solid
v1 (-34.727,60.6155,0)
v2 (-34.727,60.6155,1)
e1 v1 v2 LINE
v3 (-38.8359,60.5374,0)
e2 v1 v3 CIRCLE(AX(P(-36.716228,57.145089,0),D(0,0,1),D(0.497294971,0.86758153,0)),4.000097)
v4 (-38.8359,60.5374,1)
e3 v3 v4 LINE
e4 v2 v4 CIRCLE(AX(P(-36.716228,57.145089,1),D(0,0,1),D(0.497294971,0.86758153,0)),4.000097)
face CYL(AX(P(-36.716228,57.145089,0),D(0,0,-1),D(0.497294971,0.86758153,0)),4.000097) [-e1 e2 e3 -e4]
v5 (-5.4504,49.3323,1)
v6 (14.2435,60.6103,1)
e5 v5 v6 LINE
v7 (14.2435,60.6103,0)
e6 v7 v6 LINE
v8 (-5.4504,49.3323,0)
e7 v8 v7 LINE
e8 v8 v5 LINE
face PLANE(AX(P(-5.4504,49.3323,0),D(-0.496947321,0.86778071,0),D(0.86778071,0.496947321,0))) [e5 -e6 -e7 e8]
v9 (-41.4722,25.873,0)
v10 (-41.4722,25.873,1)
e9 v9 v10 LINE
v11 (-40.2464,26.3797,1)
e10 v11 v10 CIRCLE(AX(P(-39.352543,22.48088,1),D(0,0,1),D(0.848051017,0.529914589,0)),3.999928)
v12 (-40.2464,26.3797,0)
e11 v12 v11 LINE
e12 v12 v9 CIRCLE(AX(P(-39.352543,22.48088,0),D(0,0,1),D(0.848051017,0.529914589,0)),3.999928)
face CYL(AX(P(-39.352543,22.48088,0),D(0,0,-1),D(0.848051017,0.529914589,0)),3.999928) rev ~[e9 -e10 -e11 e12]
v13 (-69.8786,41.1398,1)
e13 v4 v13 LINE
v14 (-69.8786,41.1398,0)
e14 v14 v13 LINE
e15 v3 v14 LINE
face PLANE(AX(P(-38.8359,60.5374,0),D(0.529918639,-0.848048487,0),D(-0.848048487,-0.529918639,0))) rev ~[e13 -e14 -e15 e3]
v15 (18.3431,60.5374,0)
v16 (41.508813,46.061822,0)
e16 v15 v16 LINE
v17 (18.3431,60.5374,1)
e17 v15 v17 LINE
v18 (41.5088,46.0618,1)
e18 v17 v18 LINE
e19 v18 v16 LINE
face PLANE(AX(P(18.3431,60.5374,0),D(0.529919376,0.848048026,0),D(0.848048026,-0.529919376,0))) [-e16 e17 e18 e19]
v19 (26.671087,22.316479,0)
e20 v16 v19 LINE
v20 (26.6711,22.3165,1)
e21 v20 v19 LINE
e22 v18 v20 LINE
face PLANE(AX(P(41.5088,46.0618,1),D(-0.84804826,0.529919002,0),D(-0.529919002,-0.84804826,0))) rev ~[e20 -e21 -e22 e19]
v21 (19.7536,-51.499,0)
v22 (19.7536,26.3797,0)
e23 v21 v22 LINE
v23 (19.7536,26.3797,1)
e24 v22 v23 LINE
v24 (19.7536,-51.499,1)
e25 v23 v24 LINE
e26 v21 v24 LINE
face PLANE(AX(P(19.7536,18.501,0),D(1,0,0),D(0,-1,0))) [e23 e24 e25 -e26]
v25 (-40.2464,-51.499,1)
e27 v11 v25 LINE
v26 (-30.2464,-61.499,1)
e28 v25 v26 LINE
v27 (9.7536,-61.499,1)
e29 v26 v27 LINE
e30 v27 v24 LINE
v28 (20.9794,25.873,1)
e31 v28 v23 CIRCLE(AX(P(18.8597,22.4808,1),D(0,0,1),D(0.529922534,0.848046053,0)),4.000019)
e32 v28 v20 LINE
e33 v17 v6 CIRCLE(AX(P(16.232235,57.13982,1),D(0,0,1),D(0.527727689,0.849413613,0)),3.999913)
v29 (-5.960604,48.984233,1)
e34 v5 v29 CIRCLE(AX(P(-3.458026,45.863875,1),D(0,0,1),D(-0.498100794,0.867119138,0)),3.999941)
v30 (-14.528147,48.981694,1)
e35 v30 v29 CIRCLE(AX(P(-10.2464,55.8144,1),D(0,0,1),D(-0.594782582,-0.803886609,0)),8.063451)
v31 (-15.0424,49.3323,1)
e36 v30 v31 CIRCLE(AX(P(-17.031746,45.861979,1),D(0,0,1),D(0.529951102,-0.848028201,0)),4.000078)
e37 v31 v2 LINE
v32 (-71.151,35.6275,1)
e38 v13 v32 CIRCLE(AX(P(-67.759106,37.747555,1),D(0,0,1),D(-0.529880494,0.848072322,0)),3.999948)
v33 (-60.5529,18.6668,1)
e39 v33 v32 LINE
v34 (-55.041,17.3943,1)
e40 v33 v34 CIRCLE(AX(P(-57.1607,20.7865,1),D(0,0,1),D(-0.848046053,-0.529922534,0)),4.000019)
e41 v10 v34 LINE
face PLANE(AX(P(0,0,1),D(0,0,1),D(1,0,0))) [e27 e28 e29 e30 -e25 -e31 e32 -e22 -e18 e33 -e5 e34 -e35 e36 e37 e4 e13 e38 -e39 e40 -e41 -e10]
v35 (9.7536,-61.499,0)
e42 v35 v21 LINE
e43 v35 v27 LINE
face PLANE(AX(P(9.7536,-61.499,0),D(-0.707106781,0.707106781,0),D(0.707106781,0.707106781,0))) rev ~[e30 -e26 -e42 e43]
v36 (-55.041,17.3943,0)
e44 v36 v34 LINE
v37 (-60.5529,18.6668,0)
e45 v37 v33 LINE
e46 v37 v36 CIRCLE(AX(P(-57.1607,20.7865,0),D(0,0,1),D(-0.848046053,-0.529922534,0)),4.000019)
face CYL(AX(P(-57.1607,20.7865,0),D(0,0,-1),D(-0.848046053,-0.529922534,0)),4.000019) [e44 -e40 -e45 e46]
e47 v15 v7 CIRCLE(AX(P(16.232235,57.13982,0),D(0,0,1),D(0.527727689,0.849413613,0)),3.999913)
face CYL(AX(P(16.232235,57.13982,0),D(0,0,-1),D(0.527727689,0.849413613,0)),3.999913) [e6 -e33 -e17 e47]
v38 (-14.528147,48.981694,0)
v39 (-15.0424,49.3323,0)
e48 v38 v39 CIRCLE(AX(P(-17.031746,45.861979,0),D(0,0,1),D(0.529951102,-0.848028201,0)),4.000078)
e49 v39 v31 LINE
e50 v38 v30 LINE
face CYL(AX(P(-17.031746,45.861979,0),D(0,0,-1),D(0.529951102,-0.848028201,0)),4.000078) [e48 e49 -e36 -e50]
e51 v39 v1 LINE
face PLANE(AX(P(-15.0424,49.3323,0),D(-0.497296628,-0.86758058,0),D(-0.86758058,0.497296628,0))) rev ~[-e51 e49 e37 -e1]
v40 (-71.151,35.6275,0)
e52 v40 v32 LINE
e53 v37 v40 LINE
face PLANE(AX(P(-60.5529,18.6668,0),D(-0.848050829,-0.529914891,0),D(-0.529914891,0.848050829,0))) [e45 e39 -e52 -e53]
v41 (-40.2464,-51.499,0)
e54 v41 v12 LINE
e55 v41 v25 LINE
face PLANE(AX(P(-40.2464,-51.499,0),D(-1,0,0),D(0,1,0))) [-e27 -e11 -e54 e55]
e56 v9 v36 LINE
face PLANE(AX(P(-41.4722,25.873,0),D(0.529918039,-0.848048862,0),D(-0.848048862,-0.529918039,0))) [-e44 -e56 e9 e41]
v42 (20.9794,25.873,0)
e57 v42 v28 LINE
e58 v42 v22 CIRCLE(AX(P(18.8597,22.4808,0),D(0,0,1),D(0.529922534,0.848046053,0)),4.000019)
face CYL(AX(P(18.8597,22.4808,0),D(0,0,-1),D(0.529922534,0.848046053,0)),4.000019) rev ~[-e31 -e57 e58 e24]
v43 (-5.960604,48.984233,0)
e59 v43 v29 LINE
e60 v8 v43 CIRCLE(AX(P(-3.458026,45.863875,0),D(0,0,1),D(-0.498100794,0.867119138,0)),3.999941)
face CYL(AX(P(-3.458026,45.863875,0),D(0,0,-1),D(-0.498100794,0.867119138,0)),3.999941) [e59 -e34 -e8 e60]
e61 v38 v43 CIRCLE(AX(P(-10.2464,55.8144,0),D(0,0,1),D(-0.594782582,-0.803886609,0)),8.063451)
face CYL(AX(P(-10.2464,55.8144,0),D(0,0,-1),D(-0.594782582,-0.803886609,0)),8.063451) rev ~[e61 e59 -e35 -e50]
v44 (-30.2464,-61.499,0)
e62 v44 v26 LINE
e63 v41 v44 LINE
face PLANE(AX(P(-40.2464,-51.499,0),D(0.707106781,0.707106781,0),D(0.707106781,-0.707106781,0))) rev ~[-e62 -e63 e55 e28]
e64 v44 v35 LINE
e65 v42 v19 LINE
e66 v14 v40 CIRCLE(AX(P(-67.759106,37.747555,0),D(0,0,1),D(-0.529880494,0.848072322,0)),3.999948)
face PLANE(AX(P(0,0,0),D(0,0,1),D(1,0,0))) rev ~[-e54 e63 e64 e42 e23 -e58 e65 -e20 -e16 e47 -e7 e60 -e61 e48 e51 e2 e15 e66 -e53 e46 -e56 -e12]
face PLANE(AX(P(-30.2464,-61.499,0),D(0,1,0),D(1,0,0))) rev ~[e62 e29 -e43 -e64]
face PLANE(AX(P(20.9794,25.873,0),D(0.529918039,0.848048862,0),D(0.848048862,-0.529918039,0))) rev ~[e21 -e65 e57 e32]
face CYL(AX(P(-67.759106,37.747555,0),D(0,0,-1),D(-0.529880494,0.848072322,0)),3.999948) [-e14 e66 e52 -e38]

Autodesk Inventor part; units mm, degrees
ref_plane "YZ Plane" through (0, 0, 0) normal (1, 0, 0) x (0, 1, 0)
ref_plane "XZ Plane" through (0, 0, 0) normal (0, 1, 0) x (-1, 0, 0)
ref_plane "XY Plane" through (0, 0, 0) normal (0, 0, 1) x (1, 0, 0)
sketch "Sketch1" plane through (0, 0, 0) normal (0, 0, 1) x (1, 0, 0)
  line L0 (19.7536, 18.501) -> (19.7536, -51.499)
  line L1 (-40.2464, -51.499) -> (-40.2464, 18.501)
  line L2 (-40.2464, -51.499) -> (-30.2464, -61.499)
  line L3 (-30.2464, -61.499) -> (9.7536, -61.499)
  line L4 (9.7536, -61.499) -> (19.7536, -51.499)
  line L5 (5.9033, -42.3953) -> (-35.9604, 24.6005)
  line L6 (-41.4722, 25.873) -> (-55.041, 17.3943)
  line L7 (-60.5529, 18.6668) -> (-71.151, 35.6275)
  line L8 (8.6592, -43.0315) -> (13.7475, -39.852)
  line L9 (14.3837, -37.0961) -> (-27.4799, 29.8997)
  line L10 (-26.2074, 35.4116) -> (-14.9119, 42.4698)
  line L11 (-15.0424, 49.3323) -> (-34.727, 60.6155)
  line L12 (-38.8359, 60.5374) -> (-69.8786, 41.1398)
  arc A0 (-34.727, 60.6155) -> (-38.8359, 60.5374) centre (-36.7162, 57.1452) ccw
  arc A1 (-14.9119, 42.4698) -> (-15.0424, 49.3323) centre (-17.0316, 45.8619) ccw
  arc A2 (-35.9604, 24.6005) -> (-41.4722, 25.873) centre (-39.3526, 22.4808) ccw
  arc A3 (-26.2074, 35.4116) -> (-27.4799, 29.8997) centre (-24.0877, 32.0194) ccw
  arc A4 (5.9033, -42.3953) -> (8.6592, -43.0315) centre (7.5994, -41.3354) ccw
  arc A5 (13.7475, -39.852) -> (14.3837, -37.0961) centre (12.6876, -38.1559) ccw
  line L13 (-26.3961, -42.3953) -> (15.4675, 24.6005)
  line L14 (20.9794, 25.873) -> (34.5482, 17.3943)
  line L15 (40.3411, 19.095) -> (50.6682, 35.6217)
  line L16 (-29.152, -43.0315) -> (-34.2403, -39.852)
  line L17 (-34.8766, -37.0961) -> (6.9871, 29.8997)
  line L18 (5.7136, 35.4098) -> (-5.5789, 42.4725)
  line L19 (-5.4504, 49.3323) -> (14.2435, 60.6103)
  line L20 (18.3431, 60.5374) -> (49.3859, 41.1397)
  arc A6 (18.3431, 60.5374) -> (14.2435, 60.6103) centre (16.2322, 57.1397) ccw
  arc A7 (-5.4504, 49.3323) -> (-5.5789, 42.4725) centre (-3.4579, 45.8638) ccw
  arc A8 (20.9794, 25.873) -> (15.4675, 24.6005) centre (18.8597, 22.4808) ccw
  arc A9 (6.9871, 29.8997) -> (5.7136, 35.4098) centre (3.5938, 32.0177) ccw
  arc A10 (-29.152, -43.0315) -> (-26.3961, -42.3953) centre (-28.0922, -41.3354) ccw
  arc A11 (-34.8766, -37.0961) -> (-34.2403, -39.852) centre (-33.1805, -38.1559) ccw
  arc A12 (-15.0424, 49.3323) -> (-5.4504, 49.3323) centre (-10.2464, 55.8144) ccw
  circle A13 centre (-10.2464, -7.115) radius 26
  circle A14 centre (-10.2464, -7.115) radius 20
  line L21 (-40.2464, 18.501) -> (-40.2464, 26.3797)
  line L22 (19.7536, 18.501) -> (19.7536, 26.3797)
  line L23 (-60.5529, 18.6668) -> (-60.5529, 18.6668)
  line L24 (-55.041, 17.3943) -> (-55.041, 17.3943)
  line L25 (-69.8786, 41.1398) -> (-69.8787, 41.1397)
  line L26 (-71.1513, 35.6278) -> (-71.151, 35.6275)
  arc A15 (-69.8787, 41.1397) -> (-71.1513, 35.6278) centre (-67.7591, 37.7475) ccw
  arc A16 (-60.5529, 18.6668) -> (-55.041, 17.3943) centre (-57.1607, 20.7865) ccw
  line L27 (49.3957, 41.1336) -> (49.3859, 41.1397)
  line L28 (50.6682, 35.6217) -> (50.6682, 35.6217)
  line L29 (34.5482, 17.3943) -> (34.5579, 17.3883)
  line L30 (40.3411, 19.095) -> (40.0698, 18.6608)
  arc A17 (34.5579, 17.3883) -> (40.0698, 18.6608) centre (36.6776, 20.7804) ccw
  arc A18 (50.6682, 35.6217) -> (49.3957, 41.1336) centre (47.276, 37.7414) ccw
  point P0 (0, 0)
  point P1 (-9.2464, 46.01)
  point P2 (-36.8049, 61.8065)
  point P3 (-20.4928, 0)
  point P4 (-11.243, 46.015)
  point P5 (16.3218, 61.8004)
  dimension "d0" = 70
  dimension "d1" = 135
  dimension "d2" = 135
  dimension "d3" = 10
  dimension "d4" = 10
  dimension "d5" = 40
  dimension "d6" = 10
  dimension "d7" = 85
  dimension "d8" = 24
  dimension "d9" = 24
  dimension "d10" = 28
  dimension "d11" = 43
  dimension "d13" = 2
  dimension "d14" = 31
  dimension "d15" = 32
  dimension "d19" = 70
  dimension "d21" = 52
  dimension "d22" = 40
  dimension "d43" = 8.0635
  dimension "d66" = 54.384
  dimension "d74" = 4
  dimension "d75" = 4
  dimension "d77" = 43
  dimension "d78" = 85
  dimension "d79" = 4
extrude "Extrusion2" add sketch "Sketch1" along normal blind 1
sketch "Sketch11" plane through (0, 0, 1) normal (0, 0, 1) x (1, 0, 0)
  line L0 (40.0698, 18.6608) -> (50.6682, 35.6217) projected
  line L1 (-15.0424, 49.3323) -> (-34.727, 60.6155) projected
  arc A0 (-34.727, 60.6155) -> (-38.8359, 60.5374) centre (-36.7162, 57.1452) ccw projected
  line L2 (-38.8359, 60.5374) -> (-69.8787, 41.1397) projected
  arc A1 (-69.8787, 41.1397) -> (-71.1513, 35.6278) centre (-67.7591, 37.7475) ccw projected
  line L3 (-71.1513, 35.6278) -> (-60.5529, 18.6668) projected
  arc A2 (-60.5529, 18.6668) -> (-55.041, 17.3943) centre (-57.1607, 20.7865) ccw projected
  line L4 (-55.041, 17.3943) -> (-41.4722, 25.873) projected
  arc A3 (-40.2464, 26.3797) -> (-41.4722, 25.873) centre (-39.3526, 22.4808) ccw projected
  line L5 (-40.2464, 26.3797) -> (-40.2464, -51.499) projected
  line L6 (-40.2464, -51.499) -> (-30.2464, -61.499) projected
  line L7 (-30.2464, -61.499) -> (9.7536, -61.499) projected
  line L8 (9.7536, -61.499) -> (19.7536, -51.499) projected
  line L9 (19.7536, -51.499) -> (19.7536, 26.3797) projected
  arc A4 (20.9794, 25.873) -> (19.7536, 26.3797) centre (18.8597, 22.4808) ccw projected
  line L10 (20.9794, 25.873) -> (34.5579, 17.3883) projected
  arc A5 (34.5579, 17.3883) -> (40.0698, 18.6608) centre (36.6776, 20.7804) ccw projected
  line L11 (40.0698, 18.6608) -> (50.6682, 35.6217) projected
  arc A6 (50.6682, 35.6217) -> (49.3957, 41.1336) centre (47.276, 37.7414) ccw projected
  line L12 (49.3957, 41.1336) -> (18.3431, 60.5374) projected
  arc A7 (18.3431, 60.5374) -> (14.2435, 60.6103) centre (16.2322, 57.1397) ccw projected
  line L13 (14.2435, 60.6103) -> (-5.4504, 49.3323) projected
  arc A8 (-5.4504, 49.3323) -> (-5.9605, 48.9843) centre (-3.4579, 45.8638) ccw projected
  arc A9 (-14.528, 48.9816) -> (-5.9605, 48.9843) centre (-10.2464, 55.8144) ccw projected
  arc A10 (-14.528, 48.9816) -> (-15.0424, 49.3323) centre (-17.0316, 45.8619) ccw projected
  line L14 (41.5088, 46.0618) -> (26.6711, 22.3165)
  point P0 (0, 0)
  dimension "d80" = 13.3
extrude "Extrusion9" cut sketch "Sketch11" against normal blind 10 contours A5 L10 L14 L12 A6 L0
properties part number "Boilermake_PCBMechanicalOverlay"
